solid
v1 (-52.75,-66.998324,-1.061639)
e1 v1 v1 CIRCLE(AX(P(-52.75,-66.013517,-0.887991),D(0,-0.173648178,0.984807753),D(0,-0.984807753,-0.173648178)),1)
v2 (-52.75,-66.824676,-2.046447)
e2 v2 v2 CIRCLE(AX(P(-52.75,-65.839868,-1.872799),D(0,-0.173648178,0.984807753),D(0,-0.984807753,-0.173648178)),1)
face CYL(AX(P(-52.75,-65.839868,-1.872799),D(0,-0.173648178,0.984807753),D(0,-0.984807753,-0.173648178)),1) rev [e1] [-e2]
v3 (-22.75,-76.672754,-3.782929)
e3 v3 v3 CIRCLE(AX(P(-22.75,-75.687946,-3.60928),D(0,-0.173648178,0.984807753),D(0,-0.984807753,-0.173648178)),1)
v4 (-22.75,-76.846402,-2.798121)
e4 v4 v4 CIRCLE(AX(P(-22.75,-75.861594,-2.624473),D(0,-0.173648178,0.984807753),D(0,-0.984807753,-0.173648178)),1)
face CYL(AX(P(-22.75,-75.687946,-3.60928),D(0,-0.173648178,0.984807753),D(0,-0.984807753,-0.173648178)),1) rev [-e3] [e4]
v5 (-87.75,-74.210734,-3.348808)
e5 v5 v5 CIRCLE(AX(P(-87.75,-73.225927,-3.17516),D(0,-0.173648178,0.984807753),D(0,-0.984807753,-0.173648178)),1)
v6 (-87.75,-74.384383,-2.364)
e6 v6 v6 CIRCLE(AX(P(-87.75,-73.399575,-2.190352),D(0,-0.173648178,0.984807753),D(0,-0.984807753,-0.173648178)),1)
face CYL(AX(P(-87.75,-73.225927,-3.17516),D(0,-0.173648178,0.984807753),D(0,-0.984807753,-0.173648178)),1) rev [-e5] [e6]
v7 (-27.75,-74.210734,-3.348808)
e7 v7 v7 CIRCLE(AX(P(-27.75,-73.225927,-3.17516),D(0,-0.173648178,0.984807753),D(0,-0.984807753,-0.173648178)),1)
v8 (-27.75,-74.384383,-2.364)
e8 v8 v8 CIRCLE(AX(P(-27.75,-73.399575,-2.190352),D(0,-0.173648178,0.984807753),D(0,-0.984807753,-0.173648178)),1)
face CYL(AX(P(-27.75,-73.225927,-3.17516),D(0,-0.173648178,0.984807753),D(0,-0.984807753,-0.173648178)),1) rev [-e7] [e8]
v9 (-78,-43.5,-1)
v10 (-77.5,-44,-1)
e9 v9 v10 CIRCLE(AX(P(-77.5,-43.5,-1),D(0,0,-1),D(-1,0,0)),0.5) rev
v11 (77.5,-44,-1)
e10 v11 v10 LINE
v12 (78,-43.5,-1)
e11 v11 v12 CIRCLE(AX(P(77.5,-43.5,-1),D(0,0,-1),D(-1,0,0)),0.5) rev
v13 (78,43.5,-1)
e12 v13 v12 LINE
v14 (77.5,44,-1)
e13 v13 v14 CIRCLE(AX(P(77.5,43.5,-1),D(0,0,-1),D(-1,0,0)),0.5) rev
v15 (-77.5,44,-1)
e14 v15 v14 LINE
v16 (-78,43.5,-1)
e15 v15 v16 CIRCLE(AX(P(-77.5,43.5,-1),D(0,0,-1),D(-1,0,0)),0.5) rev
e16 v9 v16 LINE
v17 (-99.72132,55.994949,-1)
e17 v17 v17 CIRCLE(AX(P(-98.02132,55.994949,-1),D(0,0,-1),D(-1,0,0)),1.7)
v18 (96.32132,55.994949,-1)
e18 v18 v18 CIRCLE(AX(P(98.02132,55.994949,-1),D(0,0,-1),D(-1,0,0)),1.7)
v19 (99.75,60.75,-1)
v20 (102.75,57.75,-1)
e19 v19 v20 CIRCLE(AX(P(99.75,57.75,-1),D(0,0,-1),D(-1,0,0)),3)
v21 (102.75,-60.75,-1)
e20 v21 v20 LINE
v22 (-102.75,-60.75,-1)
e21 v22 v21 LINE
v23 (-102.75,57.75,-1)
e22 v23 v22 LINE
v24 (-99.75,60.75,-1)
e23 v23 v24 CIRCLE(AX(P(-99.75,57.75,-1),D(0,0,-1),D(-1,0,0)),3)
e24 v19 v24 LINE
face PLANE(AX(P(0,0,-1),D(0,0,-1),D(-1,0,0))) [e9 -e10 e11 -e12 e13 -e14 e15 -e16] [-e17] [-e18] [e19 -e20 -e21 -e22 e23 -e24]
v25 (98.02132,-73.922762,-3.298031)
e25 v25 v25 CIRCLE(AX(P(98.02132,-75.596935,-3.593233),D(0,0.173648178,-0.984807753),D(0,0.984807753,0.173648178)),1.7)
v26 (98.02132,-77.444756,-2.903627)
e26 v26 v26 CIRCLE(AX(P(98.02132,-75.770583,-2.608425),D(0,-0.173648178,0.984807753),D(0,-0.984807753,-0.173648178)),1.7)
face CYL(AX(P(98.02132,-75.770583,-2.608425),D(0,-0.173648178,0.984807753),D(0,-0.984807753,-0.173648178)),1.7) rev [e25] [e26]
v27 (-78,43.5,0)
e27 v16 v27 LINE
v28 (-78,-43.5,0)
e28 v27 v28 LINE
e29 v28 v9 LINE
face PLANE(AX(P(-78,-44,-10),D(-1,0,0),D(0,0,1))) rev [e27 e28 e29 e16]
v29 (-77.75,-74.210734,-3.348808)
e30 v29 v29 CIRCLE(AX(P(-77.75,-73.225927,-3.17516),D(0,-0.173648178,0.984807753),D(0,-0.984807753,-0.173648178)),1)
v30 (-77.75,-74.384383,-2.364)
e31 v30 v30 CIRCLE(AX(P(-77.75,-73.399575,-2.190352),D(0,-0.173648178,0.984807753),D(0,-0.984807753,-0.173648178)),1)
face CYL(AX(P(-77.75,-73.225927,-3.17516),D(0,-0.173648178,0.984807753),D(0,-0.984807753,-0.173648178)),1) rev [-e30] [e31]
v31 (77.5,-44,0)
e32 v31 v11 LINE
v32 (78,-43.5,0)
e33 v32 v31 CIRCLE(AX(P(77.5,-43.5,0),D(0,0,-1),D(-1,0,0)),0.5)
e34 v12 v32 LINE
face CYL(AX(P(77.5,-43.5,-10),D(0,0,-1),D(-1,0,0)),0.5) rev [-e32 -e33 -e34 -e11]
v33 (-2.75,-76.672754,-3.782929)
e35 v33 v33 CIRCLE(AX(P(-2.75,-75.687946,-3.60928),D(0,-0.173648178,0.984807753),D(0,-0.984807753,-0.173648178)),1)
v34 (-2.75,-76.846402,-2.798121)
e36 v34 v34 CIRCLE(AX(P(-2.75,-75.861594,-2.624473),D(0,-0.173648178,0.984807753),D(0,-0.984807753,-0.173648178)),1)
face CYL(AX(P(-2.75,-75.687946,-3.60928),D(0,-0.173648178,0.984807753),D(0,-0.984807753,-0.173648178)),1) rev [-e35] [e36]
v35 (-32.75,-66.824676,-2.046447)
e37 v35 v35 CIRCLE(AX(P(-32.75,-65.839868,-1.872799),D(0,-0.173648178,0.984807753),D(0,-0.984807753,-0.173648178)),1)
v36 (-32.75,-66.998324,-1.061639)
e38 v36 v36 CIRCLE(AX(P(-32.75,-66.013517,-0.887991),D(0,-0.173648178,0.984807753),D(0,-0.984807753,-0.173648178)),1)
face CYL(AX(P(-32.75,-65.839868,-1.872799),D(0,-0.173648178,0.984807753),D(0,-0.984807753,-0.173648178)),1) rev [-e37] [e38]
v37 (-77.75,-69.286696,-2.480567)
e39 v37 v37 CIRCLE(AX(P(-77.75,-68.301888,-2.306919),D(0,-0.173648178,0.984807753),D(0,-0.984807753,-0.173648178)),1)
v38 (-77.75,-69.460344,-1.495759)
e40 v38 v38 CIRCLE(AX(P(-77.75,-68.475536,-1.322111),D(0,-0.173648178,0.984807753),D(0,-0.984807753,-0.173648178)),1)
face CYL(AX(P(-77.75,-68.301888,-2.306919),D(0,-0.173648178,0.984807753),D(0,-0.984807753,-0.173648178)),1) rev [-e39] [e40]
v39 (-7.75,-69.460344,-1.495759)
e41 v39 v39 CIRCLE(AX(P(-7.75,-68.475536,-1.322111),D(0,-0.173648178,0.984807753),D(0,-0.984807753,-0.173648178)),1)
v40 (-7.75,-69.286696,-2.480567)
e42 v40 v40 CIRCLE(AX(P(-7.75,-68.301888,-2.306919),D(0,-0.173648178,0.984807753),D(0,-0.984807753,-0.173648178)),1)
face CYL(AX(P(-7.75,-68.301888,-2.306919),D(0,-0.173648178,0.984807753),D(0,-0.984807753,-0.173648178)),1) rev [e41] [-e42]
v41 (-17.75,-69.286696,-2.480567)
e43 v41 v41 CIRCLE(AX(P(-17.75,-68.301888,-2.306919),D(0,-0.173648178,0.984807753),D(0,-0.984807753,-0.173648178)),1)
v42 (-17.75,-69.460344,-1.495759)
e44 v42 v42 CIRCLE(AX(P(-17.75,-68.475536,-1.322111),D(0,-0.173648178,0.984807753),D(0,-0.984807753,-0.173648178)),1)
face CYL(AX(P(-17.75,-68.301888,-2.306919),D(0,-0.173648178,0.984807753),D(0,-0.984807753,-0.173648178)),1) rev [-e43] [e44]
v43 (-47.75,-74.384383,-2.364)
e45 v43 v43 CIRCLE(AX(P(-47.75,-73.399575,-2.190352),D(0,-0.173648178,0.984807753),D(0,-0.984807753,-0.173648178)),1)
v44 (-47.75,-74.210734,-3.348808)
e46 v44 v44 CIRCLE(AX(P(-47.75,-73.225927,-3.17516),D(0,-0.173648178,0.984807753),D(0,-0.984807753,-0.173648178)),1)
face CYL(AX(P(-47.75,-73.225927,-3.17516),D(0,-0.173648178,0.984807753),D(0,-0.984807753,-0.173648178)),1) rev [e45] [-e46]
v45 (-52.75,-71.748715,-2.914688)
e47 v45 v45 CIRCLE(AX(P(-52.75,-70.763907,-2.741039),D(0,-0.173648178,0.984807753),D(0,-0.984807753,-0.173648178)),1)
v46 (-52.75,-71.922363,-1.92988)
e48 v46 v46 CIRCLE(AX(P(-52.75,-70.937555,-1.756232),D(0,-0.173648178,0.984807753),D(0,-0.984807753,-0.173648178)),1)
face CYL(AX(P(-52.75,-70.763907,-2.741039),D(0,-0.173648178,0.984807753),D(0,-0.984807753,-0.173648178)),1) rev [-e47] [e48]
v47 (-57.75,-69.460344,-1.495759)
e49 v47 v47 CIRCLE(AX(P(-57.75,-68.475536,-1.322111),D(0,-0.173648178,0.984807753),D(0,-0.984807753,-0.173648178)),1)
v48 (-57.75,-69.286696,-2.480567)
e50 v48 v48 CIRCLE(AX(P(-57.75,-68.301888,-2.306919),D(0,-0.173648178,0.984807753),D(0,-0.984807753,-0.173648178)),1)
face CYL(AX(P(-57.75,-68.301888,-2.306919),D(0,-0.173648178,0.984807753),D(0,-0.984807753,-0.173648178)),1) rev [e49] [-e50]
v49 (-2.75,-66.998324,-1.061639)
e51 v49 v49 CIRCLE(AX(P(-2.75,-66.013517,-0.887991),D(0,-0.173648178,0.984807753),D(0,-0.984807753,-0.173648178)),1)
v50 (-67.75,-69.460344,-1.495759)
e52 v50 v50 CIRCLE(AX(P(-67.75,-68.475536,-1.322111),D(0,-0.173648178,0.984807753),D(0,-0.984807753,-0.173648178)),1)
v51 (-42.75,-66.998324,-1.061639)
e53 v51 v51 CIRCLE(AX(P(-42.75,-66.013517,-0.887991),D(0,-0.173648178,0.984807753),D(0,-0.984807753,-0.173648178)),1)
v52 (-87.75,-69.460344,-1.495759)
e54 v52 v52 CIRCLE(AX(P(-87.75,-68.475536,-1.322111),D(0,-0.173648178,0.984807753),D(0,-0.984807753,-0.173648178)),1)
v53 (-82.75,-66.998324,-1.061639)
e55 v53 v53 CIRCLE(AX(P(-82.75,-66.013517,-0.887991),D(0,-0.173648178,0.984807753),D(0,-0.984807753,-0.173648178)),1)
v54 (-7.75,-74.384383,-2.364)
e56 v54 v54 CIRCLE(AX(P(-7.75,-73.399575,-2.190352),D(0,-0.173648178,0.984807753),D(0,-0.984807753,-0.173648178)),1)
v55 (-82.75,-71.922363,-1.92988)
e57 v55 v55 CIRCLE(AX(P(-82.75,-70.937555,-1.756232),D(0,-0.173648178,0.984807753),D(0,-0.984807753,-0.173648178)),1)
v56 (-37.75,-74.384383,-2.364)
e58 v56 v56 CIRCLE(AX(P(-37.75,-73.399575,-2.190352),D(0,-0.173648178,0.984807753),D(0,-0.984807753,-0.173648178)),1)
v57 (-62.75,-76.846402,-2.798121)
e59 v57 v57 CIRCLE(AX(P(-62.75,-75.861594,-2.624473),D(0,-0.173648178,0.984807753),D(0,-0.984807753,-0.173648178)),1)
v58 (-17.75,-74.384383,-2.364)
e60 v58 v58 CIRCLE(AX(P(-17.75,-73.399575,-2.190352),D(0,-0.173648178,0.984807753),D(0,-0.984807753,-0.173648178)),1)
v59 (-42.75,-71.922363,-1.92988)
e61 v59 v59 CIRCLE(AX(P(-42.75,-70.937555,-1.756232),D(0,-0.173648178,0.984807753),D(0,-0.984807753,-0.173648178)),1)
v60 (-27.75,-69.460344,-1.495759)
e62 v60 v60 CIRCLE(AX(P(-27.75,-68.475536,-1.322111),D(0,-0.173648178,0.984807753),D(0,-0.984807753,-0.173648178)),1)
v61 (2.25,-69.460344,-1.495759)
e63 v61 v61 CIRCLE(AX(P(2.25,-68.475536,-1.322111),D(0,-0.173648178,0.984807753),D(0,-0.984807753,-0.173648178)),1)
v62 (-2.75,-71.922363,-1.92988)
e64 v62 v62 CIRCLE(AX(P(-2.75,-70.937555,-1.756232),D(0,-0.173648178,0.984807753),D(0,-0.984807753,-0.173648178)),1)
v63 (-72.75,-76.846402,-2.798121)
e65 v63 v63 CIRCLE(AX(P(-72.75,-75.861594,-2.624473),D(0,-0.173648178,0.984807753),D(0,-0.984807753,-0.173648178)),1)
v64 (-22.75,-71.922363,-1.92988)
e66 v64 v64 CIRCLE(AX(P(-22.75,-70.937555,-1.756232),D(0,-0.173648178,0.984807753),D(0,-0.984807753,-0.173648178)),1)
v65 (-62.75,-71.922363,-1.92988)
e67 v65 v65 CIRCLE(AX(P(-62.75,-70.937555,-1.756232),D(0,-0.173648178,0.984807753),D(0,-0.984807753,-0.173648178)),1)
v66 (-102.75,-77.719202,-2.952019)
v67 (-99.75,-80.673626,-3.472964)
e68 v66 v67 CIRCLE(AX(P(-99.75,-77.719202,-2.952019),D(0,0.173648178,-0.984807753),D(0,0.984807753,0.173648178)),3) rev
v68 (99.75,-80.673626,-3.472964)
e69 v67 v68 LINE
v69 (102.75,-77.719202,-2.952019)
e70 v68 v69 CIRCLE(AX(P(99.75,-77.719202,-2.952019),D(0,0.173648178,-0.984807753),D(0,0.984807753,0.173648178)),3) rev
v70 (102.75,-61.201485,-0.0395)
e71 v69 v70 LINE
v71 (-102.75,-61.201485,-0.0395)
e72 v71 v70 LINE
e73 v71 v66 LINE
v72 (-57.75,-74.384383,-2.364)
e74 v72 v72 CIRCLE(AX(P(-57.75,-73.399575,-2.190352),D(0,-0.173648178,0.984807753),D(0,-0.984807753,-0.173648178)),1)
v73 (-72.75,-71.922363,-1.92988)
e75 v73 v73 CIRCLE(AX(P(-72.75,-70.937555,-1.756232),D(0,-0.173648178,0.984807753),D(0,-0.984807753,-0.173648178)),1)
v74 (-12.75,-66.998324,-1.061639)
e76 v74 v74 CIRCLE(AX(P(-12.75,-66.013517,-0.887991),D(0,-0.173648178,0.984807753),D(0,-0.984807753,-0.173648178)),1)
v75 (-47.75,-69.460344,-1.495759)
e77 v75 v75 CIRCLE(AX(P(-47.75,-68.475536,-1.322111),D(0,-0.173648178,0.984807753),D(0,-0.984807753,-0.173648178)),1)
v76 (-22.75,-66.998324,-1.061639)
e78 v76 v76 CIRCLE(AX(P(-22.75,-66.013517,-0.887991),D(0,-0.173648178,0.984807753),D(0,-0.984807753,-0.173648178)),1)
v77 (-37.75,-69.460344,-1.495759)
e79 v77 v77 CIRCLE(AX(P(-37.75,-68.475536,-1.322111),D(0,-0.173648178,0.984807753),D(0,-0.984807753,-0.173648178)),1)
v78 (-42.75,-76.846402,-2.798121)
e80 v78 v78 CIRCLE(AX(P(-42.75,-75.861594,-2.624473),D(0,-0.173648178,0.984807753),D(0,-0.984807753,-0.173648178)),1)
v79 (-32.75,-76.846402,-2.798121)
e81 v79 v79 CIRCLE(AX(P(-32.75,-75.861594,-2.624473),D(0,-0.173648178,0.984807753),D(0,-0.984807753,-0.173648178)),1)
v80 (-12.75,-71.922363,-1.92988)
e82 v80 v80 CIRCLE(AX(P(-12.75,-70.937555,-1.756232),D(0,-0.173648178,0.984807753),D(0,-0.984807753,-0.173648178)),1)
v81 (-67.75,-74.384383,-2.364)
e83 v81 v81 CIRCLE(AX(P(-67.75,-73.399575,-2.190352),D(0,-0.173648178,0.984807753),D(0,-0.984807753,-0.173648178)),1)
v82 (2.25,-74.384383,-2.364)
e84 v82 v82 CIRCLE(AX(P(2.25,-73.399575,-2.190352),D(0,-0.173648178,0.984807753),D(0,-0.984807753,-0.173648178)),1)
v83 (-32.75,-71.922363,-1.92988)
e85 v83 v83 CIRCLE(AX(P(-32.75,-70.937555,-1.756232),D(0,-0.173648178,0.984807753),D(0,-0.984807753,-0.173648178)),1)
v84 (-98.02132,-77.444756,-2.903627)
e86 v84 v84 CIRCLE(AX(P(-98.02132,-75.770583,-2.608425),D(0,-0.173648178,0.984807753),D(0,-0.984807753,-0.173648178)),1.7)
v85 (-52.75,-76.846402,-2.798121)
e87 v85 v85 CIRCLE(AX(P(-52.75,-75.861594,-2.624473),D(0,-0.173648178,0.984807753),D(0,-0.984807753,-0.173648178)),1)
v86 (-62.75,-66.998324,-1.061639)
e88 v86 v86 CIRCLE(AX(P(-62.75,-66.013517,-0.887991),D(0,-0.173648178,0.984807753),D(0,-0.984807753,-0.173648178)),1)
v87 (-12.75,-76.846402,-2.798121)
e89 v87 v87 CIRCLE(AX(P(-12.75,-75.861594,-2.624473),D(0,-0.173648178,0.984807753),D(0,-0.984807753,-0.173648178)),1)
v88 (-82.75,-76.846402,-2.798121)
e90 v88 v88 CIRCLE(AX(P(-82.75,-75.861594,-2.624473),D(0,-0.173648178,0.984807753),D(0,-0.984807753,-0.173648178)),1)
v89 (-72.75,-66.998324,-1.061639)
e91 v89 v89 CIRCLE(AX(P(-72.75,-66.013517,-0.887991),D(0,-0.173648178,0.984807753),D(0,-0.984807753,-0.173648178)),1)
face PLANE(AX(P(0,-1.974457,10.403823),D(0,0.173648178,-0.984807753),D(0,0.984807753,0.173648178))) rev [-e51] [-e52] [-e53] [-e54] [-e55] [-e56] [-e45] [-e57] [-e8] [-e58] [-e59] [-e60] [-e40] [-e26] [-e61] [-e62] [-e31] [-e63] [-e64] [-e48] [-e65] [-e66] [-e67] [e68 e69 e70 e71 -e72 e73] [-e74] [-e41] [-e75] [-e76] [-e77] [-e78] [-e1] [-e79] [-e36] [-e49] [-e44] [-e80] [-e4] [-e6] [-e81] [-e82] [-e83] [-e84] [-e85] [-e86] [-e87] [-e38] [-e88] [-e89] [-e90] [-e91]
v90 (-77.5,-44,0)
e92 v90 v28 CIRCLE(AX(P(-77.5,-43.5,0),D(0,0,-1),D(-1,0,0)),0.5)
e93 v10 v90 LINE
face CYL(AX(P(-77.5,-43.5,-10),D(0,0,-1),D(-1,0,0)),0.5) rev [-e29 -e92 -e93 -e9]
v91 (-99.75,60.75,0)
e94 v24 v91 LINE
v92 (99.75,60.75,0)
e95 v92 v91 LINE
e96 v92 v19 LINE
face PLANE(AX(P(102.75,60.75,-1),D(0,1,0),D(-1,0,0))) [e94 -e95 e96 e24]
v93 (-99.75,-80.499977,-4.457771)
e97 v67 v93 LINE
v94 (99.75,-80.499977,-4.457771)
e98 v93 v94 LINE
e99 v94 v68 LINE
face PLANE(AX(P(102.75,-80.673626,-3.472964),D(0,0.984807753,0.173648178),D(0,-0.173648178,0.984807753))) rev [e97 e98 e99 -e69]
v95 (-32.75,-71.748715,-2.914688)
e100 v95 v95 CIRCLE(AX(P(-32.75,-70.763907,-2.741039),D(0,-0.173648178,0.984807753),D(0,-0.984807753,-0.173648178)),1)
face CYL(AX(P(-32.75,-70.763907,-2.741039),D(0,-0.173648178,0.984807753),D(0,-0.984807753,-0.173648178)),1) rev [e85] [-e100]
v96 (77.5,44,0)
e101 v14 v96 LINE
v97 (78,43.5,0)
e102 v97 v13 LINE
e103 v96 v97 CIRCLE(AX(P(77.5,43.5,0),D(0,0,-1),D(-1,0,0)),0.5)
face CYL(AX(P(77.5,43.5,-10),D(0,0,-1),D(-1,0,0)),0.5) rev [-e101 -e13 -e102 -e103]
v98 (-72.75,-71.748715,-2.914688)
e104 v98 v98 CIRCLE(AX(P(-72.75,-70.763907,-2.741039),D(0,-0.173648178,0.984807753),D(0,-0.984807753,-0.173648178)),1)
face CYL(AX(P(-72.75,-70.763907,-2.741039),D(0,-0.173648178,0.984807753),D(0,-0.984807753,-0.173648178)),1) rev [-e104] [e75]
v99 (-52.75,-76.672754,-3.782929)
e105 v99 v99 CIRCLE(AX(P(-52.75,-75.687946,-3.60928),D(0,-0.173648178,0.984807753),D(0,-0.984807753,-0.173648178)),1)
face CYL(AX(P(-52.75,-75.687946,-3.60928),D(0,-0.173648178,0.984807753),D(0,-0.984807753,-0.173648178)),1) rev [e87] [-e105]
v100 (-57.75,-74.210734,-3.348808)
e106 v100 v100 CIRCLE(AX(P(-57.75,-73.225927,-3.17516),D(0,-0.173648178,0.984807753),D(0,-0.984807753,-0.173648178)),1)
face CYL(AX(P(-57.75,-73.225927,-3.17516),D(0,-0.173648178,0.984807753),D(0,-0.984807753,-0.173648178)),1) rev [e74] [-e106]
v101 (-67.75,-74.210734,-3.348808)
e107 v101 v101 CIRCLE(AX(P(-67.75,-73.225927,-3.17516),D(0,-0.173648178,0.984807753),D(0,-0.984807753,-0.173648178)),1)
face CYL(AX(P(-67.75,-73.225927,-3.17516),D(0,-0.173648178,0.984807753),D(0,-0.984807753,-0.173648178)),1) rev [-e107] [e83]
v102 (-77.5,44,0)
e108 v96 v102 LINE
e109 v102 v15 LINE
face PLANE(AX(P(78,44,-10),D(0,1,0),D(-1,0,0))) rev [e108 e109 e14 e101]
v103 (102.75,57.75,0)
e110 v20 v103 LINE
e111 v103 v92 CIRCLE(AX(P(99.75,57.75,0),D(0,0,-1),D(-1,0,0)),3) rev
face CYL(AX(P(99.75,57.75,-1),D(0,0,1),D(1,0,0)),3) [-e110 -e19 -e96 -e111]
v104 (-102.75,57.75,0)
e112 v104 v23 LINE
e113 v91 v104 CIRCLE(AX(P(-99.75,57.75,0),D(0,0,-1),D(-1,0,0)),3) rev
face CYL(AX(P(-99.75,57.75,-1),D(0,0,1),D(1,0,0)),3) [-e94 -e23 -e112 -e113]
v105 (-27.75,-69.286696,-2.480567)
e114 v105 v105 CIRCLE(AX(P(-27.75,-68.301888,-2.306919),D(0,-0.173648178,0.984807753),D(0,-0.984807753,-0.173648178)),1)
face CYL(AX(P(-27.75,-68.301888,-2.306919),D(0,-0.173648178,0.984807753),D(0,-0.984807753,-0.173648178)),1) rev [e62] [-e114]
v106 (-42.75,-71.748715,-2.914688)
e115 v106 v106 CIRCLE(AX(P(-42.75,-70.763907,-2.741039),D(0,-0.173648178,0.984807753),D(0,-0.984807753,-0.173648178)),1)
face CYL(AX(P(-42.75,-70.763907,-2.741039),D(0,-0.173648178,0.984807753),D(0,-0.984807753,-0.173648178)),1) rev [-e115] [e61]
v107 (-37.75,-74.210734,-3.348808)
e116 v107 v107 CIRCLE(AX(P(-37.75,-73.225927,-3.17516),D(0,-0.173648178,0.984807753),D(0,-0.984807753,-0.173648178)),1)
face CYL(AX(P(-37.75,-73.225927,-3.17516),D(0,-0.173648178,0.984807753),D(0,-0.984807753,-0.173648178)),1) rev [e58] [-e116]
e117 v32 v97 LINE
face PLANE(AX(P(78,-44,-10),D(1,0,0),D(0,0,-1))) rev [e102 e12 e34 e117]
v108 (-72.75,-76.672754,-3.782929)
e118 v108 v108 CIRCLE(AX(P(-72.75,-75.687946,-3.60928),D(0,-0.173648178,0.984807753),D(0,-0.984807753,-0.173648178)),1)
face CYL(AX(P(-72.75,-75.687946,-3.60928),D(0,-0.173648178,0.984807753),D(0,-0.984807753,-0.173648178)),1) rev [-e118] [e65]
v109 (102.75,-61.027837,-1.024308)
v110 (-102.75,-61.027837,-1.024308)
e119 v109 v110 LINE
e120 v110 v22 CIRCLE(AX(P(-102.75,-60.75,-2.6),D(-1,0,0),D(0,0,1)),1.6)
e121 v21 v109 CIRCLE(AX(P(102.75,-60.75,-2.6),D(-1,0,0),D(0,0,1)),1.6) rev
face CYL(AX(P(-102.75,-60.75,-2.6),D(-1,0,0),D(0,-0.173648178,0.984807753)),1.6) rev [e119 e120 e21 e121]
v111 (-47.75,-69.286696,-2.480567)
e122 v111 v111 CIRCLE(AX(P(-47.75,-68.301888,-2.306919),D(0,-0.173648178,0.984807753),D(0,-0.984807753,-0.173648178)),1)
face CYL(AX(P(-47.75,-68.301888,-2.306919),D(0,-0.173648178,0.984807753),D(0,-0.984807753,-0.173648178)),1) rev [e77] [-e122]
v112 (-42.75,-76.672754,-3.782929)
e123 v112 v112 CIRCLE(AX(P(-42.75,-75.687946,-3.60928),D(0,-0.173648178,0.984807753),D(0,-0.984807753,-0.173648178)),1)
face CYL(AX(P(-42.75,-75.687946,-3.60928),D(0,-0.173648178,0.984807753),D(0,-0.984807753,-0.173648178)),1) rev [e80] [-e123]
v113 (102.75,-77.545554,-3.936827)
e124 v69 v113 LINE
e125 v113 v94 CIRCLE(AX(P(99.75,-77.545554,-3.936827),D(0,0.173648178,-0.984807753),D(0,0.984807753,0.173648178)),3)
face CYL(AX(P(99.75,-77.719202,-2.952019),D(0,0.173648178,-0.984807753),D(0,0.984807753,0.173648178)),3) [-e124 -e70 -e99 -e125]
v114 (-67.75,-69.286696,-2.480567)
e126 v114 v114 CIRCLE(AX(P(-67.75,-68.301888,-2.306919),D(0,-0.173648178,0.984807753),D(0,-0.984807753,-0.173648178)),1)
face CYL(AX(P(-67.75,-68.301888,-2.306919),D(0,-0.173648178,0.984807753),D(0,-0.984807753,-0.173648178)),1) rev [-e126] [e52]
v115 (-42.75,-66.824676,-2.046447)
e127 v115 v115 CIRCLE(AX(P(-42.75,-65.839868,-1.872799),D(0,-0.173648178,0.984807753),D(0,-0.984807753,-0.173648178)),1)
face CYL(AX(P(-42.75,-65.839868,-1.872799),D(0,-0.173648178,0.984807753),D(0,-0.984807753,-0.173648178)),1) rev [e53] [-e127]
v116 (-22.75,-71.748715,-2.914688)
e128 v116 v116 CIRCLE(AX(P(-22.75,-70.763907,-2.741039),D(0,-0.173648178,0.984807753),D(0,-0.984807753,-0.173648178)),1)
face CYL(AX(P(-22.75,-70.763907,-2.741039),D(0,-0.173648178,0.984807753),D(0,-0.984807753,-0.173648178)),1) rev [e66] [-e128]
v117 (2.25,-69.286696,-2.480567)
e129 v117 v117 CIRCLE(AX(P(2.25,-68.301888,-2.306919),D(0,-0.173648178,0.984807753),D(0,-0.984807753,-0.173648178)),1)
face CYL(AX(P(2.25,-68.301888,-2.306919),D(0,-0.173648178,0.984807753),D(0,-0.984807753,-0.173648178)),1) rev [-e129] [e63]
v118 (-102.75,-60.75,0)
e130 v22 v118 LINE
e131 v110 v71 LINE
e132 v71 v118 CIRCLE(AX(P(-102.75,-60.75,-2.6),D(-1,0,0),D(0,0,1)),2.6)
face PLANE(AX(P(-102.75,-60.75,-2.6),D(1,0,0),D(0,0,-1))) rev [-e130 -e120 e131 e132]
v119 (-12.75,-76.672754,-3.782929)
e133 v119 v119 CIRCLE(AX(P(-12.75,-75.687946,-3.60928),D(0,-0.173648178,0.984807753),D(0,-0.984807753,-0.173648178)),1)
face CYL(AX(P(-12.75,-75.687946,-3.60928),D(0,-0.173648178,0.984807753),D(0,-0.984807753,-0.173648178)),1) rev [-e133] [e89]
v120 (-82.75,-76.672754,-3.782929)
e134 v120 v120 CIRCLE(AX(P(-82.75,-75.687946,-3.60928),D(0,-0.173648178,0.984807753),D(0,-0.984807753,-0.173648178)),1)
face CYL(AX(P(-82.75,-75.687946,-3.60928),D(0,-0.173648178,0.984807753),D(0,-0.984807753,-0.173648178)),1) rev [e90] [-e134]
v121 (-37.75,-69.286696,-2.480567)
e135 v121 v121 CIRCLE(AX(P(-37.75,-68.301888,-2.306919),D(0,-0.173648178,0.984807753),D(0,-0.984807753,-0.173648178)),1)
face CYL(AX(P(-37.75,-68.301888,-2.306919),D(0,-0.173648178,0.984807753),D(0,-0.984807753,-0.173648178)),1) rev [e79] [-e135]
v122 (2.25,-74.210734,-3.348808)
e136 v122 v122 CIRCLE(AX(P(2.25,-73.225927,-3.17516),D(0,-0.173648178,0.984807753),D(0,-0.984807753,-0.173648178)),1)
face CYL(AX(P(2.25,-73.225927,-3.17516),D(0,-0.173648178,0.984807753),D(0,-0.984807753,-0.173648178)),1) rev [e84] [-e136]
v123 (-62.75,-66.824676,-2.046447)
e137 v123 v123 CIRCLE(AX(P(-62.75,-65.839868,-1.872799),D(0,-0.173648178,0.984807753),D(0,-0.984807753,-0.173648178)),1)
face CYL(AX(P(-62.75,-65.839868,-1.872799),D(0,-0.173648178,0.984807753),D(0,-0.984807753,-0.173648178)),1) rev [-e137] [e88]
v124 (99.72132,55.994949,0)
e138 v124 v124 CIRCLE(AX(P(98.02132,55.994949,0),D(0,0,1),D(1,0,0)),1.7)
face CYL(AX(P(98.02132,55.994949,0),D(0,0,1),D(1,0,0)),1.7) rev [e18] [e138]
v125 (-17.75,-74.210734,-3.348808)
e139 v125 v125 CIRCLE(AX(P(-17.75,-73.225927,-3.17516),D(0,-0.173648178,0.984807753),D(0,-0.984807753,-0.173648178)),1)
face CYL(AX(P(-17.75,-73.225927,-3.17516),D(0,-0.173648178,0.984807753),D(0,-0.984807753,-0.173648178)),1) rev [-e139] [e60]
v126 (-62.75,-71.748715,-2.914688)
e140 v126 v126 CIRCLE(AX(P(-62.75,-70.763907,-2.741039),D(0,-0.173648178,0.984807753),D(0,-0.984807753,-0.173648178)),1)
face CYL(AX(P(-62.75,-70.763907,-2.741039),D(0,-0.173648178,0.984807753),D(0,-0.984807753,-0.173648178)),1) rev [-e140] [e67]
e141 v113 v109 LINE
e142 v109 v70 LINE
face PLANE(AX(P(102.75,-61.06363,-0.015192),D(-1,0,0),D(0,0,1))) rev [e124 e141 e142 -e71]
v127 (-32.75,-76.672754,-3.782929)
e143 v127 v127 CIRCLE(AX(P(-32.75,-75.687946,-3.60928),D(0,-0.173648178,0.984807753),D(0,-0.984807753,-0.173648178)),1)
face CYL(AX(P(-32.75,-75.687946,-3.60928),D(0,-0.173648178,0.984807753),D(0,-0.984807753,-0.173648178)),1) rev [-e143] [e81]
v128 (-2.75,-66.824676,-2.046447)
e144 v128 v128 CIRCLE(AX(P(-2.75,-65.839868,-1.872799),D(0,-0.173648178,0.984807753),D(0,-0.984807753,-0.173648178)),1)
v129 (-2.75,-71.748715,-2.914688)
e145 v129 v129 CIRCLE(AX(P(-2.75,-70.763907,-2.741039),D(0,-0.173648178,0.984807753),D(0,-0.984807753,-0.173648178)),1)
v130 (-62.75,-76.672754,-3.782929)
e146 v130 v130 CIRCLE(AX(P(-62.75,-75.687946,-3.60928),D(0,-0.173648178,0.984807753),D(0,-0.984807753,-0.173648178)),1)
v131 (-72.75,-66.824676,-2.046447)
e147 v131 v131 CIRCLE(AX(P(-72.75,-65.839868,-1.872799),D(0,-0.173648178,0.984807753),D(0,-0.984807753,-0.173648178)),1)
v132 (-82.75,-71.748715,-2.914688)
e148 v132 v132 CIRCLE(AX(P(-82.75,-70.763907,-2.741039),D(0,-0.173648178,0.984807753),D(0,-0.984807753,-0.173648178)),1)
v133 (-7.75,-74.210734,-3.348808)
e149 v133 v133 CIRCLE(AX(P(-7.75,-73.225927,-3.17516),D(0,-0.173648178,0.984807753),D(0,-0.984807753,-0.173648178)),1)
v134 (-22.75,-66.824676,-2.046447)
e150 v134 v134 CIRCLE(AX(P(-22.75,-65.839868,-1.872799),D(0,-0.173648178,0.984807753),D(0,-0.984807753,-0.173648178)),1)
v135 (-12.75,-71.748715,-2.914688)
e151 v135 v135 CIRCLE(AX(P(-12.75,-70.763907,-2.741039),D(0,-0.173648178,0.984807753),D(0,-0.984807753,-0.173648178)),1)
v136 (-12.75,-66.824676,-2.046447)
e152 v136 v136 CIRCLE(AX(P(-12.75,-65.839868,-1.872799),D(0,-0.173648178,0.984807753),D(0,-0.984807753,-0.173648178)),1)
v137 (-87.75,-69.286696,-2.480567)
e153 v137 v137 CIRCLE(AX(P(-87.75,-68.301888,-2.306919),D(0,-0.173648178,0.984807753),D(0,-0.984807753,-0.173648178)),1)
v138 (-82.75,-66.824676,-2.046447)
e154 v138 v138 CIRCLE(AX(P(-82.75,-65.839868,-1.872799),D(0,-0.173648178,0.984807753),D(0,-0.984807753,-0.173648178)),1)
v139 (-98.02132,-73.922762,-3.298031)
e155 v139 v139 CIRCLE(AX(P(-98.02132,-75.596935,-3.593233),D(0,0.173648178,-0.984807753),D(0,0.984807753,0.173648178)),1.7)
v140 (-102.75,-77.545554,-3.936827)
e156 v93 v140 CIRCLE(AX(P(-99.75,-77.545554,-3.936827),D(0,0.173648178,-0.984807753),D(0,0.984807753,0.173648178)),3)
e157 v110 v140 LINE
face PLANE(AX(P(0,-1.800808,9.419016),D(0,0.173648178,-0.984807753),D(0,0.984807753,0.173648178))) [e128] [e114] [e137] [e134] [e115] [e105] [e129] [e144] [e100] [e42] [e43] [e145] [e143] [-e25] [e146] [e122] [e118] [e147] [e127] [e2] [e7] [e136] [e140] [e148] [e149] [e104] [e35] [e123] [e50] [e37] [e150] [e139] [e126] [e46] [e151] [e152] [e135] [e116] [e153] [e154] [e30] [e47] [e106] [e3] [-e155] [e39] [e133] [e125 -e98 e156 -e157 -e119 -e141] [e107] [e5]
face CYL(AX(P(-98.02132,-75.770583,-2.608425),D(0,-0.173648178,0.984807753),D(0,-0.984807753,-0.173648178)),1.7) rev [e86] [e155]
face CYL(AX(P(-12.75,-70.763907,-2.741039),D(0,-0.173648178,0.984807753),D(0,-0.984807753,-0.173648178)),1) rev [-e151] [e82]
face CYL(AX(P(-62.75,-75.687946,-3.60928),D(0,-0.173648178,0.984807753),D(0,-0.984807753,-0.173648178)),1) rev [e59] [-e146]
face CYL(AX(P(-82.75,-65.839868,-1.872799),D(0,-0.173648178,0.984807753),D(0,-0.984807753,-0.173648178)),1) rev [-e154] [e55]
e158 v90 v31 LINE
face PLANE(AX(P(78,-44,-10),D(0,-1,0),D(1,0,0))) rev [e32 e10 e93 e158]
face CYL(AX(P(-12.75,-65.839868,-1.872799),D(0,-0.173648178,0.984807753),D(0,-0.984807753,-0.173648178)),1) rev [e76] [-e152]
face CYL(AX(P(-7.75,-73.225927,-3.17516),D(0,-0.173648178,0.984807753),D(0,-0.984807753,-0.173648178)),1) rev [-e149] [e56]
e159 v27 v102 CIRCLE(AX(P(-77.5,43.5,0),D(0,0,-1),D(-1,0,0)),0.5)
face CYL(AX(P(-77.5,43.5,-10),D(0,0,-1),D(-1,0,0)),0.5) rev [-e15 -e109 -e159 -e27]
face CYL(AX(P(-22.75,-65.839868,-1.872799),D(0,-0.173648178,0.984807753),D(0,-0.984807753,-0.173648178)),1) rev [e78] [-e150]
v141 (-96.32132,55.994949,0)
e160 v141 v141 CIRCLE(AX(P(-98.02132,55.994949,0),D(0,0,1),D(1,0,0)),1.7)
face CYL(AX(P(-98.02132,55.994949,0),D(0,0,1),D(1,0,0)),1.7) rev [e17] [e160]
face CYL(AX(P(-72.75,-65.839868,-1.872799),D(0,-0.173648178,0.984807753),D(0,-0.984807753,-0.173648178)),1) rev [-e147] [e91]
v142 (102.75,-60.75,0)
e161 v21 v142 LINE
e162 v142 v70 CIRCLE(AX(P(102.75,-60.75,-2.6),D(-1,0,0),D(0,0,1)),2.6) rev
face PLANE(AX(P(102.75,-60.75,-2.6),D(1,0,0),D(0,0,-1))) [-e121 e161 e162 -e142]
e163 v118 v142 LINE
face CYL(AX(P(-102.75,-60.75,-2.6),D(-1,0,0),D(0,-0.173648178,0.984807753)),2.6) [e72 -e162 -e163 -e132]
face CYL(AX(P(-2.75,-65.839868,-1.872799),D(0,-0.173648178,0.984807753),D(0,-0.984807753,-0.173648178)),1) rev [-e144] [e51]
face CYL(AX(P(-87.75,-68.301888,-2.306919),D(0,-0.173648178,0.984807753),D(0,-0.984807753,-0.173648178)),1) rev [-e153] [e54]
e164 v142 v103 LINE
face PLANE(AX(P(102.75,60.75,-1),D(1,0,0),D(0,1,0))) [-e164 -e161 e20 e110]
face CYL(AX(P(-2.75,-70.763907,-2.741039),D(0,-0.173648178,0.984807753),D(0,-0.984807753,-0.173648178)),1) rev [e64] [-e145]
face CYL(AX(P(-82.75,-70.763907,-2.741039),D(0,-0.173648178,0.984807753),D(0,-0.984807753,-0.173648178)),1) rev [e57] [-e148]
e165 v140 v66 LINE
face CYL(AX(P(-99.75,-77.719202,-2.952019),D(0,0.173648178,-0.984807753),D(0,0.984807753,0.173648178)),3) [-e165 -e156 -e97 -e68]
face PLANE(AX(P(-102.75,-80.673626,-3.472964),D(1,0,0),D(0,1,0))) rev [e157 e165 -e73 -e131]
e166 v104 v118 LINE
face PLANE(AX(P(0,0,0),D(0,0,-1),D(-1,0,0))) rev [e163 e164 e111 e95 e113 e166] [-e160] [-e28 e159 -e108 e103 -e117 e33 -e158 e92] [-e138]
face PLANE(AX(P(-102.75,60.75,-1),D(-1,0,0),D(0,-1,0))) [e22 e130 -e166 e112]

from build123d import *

# Parameters (mm, degrees)
SKETCH_2_W                      = 205.5
SKETCH_2_H                      = 121.5
SM_BASE_FLANGE_1_DEPTH          = 1
SM_EDGE_FLANGE_1_DEPTH          = 205.5
FILLET_1_R                      = 3
SKETCH_12_W                     = 156
SKETCH_12_H                     = 88
CUT_EXTRUDE_2_DEPTH             = 10
FILLET_2_R                      = 0.5
HOLE_WIZARD_M31_D               = 3.4
HOLE_WIZARD_M31_DEPTH           = 8.5
HOLE_WIZARD_M31_TIP             = 1.021463052
HOLE_WIZARD_M31_ON_FACE_2_D     = 3.4
HOLE_WIZARD_M31_ON_FACE_2_DEPTH = 8.5
HOLE_WIZARD_M31_ON_FACE_2_TIP   = 1.021463052
HOLE_WIZARD_M31_ON_FACE_3_D     = 3.4
HOLE_WIZARD_M31_ON_FACE_3_DEPTH = 8.5
HOLE_WIZARD_M31_ON_FACE_3_TIP   = 1.021463052
SKETCH_16_R                     = 1
CUT_EXTRUDE_3_DEPTH             = 10
PATTERN_LINEAR_1_COUNT          = 5
PATTERN_LINEAR_1_PITCH          = 10
PATTERN_LINEAR_1_COL_COUNT      = 5
PATTERN_LINEAR_1_COL_PITCH      = 10
SKETCH_17_R                     = 1
CUT_EXTRUDE_4_DEPTH             = 1
PATTERN_LINEAR_2_COUNT          = 6
PATTERN_LINEAR_2_PITCH          = 10
PATTERN_LINEAR_2_COL_COUNT      = 5
PATTERN_LINEAR_2_COL_PITCH      = 10


# Sheet-metal steps are written as plain solids
with BuildPart() as part:
    # Sketch 2 → Базовая кромка1 (new body)
    with BuildSketch(Plane.XY):
        Rectangle(SKETCH_2_W, SKETCH_2_H)
    extrude(amount=-SM_BASE_FLANGE_1_DEPTH)

    # Ребро-кромка1 section (across the edge) → Ребро-кромка1 (add)
    with BuildSketch(Plane(origin=(102.75, -60.889981862, -1), x_dir=(0, 0.1736481776669237, -0.9848077530122092), z_dir=(-1, 0, 0))):
        with BuildLine():
            Line((-1, 0.139981862), (-1, 19.912511336))
            Line((-1, 19.912511336), (0, 19.912511336))
            Line((0, 19.912511336), (0, 0.139981862))
            ThreePointArc((0, 0.139981862), (0.006088483, 0.000532673), (0.024307595, -0.137855223))
            Line((0.024307595, -0.137855223), (-0.960500158, -0.3115034))
            ThreePointArc((-0.960500158, -0.3115034), (-0.990106215, -0.08662307), (-1, 0.139981862))
        make_face()
    extrude(amount=SM_EDGE_FLANGE_1_DEPTH)

    # Скругление1
    fillet_1_edges = [part.edges().sort_by_distance(p)[0] for p in [
        (102.75, -80.586801497, -3.96536743),
        (-102.75, -80.586801497, -3.96536743),
        (-102.75, 60.75, -0.5),
        (102.75, 60.75, -0.5),
    ]]
    fillet(fillet_1_edges, radius=FILLET_1_R)

    # Эскиз12 → Вырез-Вытянуть2 (cut)
    with BuildSketch(Plane.XY):
        Rectangle(SKETCH_12_W, SKETCH_12_H)
    extrude(amount=-CUT_EXTRUDE_2_DEPTH, mode=Mode.SUBTRACT)

    # Скругление2
    fillet_2_edges = [part.edges().sort_by_distance(p)[0] for p in [
        (-78, -44, -0.5),
        (-78, 44, -0.5),
        (78, 44, -0.5),
        (78, -44, -0.5),
    ]]
    fillet(fillet_2_edges, radius=FILLET_2_R)

    # Сверло под метчик  спиральное M31
    with Locations(Plane(origin=(-98.021320344, -75.77058326, -2.608424904), x_dir=(0, 0.984807753012, 0.173648177667), z_dir=(0, -0.173648177667, 0.984807753012))):
        with Locations((0, 0)):
            Hole(HOLE_WIZARD_M31_D / 2, depth=HOLE_WIZARD_M31_DEPTH)
            with Locations((0, 0, -(HOLE_WIZARD_M31_DEPTH + HOLE_WIZARD_M31_TIP / 2))):  # 118° drill point
                Cone(0, HOLE_WIZARD_M31_D / 2, HOLE_WIZARD_M31_TIP, mode=Mode.SUBTRACT)

    # Сверло под метчик  спиральное M31 on face 2
    with Locations(Plane(origin=(98.021320344, -75.77058326, -2.608424904), x_dir=(0, 0.984807790843, 0.17364796312), z_dir=(0, -0.17364796312, 0.984807790843))):
        with Locations((0, 0)):
            Hole(HOLE_WIZARD_M31_ON_FACE_2_D / 2, depth=HOLE_WIZARD_M31_ON_FACE_2_DEPTH)
            with Locations((0, 0, -(HOLE_WIZARD_M31_ON_FACE_2_DEPTH + HOLE_WIZARD_M31_ON_FACE_2_TIP / 2))):  # 118° drill point
                Cone(0, HOLE_WIZARD_M31_ON_FACE_2_D / 2, HOLE_WIZARD_M31_ON_FACE_2_TIP, mode=Mode.SUBTRACT)

    # Сверло под метчик  спиральное M31 on face 3
    with Locations(Plane(origin=(-98.021320344, 55.994949149, 0), x_dir=(1, 0, 0), z_dir=(0, 0, 1))):
        with Locations((0, 0), (196.042640688, 0)):
            Hole(HOLE_WIZARD_M31_ON_FACE_3_D / 2, depth=HOLE_WIZARD_M31_ON_FACE_3_DEPTH)
            with Locations((0, 0, -(HOLE_WIZARD_M31_ON_FACE_3_DEPTH + HOLE_WIZARD_M31_ON_FACE_3_TIP / 2))):  # 118° drill point
                Cone(0, HOLE_WIZARD_M31_ON_FACE_3_D / 2, HOLE_WIZARD_M31_ON_FACE_3_TIP, mode=Mode.SUBTRACT)

    # Эскиз16 → Вырез-Вытянуть3 (cut)
    with BuildSketch(Plane(origin=(0, -1.838695719, 10.427761604), x_dir=(1, 0, 0), z_dir=(0, -0.17364817766692364, 0.9848077530122092))):
        with Locations(Location((-42.75, -70.164820995, 0), (0, 0, 270))):
            Circle(SKETCH_16_R)
        with Locations(Location((-42.75, -65.164820995, 0), (0, 0, 270))):
            Circle(SKETCH_16_R)
        with Locations(Location((-42.75, -75.164820995, 0), (0, 0, 270))):
            Circle(SKETCH_16_R)
    cut_extrude_3 = extrude(amount=-CUT_EXTRUDE_3_DEPTH, mode=Mode.SUBTRACT)

    # Линейный массив1: Вырез-Вытянуть3 ×5
    with Locations(*[(i * PATTERN_LINEAR_1_PITCH, 0, 0) for i in range(1, PATTERN_LINEAR_1_COUNT)]):
        add(cut_extrude_3, mode=Mode.SUBTRACT)

    # Линейный массив1 col: Вырез-Вытянуть3 ×5
    with Locations(*[(-i * PATTERN_LINEAR_1_COL_PITCH, 0, 0) for i in range(1, PATTERN_LINEAR_1_COL_COUNT)]):
        add(cut_extrude_3, mode=Mode.SUBTRACT)

    # Эскиз17 → Вырез-Вытянуть4 (cut)
    with BuildSketch(Plane(origin=(0, -1.838695719, 10.427761604), x_dir=(1, 0, 0), z_dir=(0, -0.17364817766692364, 0.9848077530122092))):
        with Locations(Location((-47.75, -67.664820995, 0), (0, 0, 270))):
            Circle(SKETCH_17_R)
        with Locations(Location((-47.75, -72.664820995, 0), (0, 0, 270))):
            Circle(SKETCH_17_R)
    cut_extrude_4 = extrude(amount=-CUT_EXTRUDE_4_DEPTH, mode=Mode.SUBTRACT)

    # Линейный массив2: Вырез-Вытянуть4 ×6
    with Locations(*[(i * PATTERN_LINEAR_2_PITCH, 0, 0) for i in range(1, PATTERN_LINEAR_2_COUNT)]):
        add(cut_extrude_4, mode=Mode.SUBTRACT)

    # Линейный массив2 col: Вырез-Вытянуть4 ×5
    with Locations(*[(-i * PATTERN_LINEAR_2_COL_PITCH, 0, 0) for i in range(1, PATTERN_LINEAR_2_COL_COUNT)]):
        add(cut_extrude_4, mode=Mode.SUBTRACT)


solid = part.part
